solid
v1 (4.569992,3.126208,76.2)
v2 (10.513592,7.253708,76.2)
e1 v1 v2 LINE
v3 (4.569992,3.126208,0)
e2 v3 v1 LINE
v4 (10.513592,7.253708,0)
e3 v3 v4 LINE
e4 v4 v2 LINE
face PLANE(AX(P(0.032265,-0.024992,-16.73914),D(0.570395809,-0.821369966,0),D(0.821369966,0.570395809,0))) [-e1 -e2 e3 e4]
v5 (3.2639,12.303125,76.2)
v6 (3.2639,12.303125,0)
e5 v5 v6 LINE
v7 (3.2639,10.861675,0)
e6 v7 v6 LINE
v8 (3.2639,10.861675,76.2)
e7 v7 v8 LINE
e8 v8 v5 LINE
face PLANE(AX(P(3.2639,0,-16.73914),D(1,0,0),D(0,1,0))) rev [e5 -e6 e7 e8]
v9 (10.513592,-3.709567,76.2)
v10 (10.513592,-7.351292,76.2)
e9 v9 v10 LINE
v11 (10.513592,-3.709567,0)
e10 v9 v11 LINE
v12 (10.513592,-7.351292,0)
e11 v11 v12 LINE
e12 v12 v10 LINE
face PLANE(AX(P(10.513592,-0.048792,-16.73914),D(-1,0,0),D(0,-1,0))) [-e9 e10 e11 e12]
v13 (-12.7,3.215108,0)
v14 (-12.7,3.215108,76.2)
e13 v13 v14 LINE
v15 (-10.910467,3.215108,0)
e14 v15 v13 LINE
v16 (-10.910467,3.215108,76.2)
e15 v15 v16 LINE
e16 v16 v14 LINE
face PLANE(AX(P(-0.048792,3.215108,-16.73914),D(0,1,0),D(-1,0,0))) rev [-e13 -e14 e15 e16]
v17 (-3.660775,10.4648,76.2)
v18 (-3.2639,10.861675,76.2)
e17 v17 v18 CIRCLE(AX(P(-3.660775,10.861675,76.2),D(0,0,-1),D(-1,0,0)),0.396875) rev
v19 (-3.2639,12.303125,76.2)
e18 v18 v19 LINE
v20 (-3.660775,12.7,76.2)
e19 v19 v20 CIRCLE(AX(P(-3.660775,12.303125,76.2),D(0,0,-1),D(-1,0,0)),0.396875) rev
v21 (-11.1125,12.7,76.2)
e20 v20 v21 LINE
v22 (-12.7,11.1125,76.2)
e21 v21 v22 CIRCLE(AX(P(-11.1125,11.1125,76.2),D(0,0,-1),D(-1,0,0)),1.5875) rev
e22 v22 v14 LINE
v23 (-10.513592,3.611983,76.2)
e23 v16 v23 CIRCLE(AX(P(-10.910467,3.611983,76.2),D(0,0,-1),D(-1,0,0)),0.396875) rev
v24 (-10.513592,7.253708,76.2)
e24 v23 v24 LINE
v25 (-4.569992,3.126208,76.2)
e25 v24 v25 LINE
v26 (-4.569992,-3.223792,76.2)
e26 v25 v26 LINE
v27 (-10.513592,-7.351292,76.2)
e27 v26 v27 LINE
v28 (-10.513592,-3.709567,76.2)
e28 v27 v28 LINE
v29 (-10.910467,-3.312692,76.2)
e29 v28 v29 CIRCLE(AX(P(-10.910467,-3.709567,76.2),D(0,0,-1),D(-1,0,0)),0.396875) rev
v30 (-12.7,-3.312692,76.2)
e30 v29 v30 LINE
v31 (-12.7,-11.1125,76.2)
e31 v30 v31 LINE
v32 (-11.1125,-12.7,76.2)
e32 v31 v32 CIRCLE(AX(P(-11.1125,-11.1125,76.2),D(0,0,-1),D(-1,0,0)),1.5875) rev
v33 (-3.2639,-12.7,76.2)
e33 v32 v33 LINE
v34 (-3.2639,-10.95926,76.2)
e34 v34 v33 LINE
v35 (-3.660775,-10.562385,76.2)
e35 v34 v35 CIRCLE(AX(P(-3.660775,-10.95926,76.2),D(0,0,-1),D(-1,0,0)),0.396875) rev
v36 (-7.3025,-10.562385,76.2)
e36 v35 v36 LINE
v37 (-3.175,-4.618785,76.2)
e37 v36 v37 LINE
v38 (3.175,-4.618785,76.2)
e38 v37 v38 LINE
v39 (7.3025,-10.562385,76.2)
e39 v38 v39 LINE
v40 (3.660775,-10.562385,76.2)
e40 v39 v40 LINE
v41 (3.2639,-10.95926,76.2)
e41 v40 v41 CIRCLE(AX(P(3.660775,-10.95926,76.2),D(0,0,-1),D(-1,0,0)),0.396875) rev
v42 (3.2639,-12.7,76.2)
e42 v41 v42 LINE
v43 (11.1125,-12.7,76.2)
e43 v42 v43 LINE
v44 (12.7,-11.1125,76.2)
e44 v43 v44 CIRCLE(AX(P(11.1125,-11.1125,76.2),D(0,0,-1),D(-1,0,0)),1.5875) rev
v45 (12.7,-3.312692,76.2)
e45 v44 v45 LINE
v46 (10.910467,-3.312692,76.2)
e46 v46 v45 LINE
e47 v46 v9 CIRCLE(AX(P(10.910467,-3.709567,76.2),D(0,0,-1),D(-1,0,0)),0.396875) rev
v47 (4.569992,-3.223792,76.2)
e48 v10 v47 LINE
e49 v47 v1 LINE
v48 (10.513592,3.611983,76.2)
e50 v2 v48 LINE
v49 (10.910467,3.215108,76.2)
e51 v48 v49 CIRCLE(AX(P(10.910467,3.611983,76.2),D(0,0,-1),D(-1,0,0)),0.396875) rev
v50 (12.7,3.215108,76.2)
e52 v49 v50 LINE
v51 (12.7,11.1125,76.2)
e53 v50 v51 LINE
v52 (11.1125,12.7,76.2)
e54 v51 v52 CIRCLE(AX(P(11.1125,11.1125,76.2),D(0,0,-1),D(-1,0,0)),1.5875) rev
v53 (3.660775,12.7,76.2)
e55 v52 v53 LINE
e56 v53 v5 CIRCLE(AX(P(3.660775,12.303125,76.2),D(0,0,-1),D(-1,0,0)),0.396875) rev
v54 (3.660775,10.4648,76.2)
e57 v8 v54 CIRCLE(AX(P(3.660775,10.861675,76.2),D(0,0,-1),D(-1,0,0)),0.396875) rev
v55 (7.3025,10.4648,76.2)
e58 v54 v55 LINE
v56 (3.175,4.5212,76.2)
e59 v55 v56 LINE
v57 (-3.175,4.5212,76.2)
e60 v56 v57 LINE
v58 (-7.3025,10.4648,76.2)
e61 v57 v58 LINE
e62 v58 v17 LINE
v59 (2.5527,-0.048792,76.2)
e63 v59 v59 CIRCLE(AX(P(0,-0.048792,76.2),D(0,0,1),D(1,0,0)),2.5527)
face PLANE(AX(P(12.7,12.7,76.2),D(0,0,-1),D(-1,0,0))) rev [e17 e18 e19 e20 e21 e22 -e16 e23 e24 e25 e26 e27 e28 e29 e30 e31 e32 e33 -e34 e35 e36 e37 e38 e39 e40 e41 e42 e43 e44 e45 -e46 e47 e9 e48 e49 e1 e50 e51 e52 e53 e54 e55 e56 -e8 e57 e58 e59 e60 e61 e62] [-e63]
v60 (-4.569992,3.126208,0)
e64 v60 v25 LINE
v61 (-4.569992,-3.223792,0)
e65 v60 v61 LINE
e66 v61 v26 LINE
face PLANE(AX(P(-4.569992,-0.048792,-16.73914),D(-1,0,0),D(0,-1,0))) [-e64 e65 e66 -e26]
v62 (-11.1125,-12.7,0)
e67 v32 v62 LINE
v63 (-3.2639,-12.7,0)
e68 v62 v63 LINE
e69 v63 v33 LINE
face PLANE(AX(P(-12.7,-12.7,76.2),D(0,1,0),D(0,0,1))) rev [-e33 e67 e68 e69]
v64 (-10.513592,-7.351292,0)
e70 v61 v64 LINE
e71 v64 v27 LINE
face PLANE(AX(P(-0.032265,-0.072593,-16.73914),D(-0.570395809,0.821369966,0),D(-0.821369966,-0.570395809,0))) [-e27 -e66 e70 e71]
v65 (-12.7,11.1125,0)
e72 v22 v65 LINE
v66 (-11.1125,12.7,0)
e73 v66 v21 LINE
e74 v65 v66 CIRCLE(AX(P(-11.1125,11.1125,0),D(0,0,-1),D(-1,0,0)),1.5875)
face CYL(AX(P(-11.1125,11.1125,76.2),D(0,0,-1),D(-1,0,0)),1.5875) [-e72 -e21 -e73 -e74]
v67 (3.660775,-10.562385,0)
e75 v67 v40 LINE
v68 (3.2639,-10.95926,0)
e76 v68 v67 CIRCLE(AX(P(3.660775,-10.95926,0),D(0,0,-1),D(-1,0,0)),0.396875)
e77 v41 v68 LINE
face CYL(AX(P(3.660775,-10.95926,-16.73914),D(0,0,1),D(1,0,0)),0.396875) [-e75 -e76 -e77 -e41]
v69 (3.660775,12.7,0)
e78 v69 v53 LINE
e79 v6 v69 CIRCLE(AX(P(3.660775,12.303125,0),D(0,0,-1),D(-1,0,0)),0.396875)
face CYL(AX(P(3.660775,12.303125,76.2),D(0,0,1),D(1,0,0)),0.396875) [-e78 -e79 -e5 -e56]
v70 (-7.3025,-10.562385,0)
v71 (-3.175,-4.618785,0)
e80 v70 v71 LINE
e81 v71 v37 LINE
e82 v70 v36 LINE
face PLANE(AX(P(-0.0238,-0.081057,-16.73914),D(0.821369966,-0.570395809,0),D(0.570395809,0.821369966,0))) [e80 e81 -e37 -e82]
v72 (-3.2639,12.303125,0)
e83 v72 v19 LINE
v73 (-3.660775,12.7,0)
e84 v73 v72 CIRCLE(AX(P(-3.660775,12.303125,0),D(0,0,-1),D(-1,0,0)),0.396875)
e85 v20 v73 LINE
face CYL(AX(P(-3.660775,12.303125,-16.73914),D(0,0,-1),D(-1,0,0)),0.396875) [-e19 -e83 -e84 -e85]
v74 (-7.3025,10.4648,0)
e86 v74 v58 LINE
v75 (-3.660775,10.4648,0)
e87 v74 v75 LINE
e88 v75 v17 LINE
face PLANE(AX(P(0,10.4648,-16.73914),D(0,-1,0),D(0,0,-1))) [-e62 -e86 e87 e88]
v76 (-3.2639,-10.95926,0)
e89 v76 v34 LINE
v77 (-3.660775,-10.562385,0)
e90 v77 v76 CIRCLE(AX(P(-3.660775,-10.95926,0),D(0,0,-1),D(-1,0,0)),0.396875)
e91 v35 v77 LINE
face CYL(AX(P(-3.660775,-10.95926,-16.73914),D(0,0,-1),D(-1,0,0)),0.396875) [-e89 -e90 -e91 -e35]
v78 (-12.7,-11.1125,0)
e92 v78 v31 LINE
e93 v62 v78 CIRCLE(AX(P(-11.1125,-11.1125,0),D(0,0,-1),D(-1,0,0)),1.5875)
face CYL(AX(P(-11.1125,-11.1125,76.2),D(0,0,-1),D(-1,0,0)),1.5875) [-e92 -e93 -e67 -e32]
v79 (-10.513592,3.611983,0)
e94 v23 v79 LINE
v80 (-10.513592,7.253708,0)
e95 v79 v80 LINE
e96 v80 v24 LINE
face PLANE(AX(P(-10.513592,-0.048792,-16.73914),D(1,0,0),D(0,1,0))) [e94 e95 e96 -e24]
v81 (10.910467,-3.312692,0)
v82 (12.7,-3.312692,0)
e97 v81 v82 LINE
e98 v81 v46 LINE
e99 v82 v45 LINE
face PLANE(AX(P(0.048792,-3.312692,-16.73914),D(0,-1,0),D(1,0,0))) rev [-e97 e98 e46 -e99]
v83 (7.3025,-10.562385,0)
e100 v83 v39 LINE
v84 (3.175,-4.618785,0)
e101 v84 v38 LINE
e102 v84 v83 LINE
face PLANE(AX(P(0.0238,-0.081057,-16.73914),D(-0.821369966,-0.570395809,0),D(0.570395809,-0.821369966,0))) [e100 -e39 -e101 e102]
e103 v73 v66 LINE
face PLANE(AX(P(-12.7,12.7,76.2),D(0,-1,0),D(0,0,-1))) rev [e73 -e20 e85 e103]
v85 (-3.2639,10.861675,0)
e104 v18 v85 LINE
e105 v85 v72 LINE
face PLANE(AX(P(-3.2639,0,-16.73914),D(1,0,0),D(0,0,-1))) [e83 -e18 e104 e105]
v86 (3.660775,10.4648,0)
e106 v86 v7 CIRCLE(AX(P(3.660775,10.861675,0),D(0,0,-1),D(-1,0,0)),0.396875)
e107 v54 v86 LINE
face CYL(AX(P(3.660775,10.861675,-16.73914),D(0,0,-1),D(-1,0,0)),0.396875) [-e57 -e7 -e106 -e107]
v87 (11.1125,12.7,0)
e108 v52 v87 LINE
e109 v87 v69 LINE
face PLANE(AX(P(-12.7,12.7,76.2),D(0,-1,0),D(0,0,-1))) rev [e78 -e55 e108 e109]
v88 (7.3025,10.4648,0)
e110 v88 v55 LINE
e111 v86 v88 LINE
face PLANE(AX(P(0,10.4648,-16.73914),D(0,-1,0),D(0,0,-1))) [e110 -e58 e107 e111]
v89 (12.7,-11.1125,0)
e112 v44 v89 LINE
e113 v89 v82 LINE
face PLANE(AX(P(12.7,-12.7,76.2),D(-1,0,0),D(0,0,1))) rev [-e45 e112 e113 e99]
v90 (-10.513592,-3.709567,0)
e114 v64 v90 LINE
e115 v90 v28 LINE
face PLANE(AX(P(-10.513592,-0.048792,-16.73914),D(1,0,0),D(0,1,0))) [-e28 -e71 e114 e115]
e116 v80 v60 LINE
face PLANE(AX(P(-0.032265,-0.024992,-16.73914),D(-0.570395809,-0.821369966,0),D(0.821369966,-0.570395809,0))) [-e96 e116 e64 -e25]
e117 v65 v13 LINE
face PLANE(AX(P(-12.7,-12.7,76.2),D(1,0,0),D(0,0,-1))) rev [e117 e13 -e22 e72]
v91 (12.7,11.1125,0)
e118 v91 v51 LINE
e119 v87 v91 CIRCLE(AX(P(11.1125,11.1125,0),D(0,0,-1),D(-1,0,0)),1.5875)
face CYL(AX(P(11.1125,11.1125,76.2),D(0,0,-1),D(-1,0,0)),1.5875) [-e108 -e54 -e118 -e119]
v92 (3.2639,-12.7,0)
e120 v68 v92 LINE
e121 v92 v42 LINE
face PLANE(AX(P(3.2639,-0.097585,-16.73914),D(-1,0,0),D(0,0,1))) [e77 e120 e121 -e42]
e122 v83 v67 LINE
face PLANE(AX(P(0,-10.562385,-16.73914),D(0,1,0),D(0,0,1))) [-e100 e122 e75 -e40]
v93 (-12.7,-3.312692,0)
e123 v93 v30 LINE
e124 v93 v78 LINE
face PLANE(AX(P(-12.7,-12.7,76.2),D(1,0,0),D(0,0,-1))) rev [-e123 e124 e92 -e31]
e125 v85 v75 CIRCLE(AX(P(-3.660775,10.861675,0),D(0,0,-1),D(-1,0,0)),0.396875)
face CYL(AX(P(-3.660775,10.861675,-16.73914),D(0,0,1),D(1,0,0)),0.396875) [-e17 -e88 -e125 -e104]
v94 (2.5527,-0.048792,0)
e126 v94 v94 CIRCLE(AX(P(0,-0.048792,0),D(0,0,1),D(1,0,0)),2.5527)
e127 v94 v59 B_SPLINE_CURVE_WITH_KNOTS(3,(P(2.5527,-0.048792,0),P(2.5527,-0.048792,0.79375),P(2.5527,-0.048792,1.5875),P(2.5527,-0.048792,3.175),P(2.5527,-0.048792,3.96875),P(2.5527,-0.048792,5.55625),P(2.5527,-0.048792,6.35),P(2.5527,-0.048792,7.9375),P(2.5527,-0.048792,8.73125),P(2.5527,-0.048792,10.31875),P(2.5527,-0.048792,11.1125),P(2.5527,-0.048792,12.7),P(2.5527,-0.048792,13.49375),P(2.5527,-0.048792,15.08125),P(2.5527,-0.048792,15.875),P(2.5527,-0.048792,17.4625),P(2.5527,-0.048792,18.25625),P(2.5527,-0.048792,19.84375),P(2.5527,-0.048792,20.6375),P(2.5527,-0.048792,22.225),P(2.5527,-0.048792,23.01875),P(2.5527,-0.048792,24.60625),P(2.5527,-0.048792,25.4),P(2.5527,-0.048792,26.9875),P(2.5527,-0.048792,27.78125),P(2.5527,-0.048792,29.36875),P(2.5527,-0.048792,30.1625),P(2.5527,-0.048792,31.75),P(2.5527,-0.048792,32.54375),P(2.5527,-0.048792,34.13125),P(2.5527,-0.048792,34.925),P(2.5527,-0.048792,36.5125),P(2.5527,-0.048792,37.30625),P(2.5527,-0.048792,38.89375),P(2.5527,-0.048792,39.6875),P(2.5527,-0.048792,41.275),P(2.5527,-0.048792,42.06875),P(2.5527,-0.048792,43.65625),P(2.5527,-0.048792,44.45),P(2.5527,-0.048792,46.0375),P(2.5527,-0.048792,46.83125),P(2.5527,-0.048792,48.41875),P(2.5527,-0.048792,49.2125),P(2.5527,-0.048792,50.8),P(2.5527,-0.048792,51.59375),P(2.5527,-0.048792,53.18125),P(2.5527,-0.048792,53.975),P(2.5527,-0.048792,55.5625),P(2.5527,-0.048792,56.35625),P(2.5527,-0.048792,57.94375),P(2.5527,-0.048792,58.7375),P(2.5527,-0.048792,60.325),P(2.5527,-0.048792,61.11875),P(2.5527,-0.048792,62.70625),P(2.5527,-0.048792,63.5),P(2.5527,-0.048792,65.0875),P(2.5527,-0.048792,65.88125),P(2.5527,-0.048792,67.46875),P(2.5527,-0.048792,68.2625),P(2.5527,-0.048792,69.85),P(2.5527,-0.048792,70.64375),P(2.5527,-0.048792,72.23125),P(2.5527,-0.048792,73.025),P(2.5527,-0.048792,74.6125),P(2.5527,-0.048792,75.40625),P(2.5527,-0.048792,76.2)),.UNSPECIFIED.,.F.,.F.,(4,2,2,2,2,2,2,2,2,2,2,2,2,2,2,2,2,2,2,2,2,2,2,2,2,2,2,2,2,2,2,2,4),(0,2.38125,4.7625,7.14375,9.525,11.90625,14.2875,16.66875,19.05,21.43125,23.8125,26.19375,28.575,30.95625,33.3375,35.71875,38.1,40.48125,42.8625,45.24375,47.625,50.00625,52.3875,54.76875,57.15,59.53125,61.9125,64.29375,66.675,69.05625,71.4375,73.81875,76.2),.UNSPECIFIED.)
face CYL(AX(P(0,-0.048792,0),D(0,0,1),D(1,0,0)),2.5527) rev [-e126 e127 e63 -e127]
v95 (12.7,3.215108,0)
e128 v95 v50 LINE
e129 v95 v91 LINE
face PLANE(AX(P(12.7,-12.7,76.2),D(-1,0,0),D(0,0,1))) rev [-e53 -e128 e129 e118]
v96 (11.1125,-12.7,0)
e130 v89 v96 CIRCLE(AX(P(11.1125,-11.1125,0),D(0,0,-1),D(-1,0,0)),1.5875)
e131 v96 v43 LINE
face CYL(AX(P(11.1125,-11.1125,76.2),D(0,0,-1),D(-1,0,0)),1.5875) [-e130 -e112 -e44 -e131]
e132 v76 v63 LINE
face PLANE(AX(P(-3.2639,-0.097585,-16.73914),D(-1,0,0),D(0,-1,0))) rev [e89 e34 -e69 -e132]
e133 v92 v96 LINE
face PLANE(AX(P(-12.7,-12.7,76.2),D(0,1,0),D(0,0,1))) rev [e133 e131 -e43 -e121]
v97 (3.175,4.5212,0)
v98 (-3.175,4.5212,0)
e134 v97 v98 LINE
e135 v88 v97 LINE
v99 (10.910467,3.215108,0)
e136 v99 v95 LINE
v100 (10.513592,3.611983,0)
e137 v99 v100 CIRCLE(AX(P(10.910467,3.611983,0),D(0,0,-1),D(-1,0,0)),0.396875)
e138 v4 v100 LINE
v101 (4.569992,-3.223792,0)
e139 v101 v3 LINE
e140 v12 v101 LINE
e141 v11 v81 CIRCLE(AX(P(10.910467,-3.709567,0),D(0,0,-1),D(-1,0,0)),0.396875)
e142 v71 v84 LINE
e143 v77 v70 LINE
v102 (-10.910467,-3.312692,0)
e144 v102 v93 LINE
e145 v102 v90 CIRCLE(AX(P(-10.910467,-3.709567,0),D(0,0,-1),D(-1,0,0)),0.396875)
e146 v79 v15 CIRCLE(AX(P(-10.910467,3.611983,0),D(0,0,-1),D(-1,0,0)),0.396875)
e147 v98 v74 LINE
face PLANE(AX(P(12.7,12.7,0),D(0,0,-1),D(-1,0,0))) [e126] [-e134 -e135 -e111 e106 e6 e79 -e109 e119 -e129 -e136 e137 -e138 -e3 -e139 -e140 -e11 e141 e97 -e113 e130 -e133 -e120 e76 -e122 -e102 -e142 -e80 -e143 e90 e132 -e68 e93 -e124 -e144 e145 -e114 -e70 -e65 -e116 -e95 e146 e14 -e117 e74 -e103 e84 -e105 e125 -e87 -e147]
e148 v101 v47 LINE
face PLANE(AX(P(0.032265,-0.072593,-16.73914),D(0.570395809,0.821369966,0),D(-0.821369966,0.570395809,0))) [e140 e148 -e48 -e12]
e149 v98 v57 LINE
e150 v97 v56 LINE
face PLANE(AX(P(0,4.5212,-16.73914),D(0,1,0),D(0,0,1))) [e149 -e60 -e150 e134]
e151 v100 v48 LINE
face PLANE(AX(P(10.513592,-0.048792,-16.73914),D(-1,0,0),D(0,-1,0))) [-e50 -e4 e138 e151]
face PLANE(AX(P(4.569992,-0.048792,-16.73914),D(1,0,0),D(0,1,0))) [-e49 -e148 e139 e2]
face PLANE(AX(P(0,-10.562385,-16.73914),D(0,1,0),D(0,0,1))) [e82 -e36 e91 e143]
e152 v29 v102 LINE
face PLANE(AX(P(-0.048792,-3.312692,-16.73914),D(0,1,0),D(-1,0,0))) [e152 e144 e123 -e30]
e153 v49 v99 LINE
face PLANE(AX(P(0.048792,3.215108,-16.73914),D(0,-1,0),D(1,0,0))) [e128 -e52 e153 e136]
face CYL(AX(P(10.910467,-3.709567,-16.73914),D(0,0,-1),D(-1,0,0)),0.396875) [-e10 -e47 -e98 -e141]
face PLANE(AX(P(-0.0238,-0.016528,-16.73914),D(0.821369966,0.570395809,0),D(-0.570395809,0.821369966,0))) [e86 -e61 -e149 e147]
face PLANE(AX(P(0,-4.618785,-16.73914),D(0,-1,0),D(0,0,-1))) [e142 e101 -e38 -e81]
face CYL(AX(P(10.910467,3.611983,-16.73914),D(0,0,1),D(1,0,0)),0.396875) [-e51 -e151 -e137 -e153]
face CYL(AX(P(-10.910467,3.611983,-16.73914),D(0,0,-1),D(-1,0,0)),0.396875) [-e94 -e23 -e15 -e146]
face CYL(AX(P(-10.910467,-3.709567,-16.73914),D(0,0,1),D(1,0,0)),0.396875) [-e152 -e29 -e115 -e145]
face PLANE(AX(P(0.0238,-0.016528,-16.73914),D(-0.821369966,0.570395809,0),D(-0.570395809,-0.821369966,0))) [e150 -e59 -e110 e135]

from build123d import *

# Parameters (mm, degrees)
SKETCH1_W           = 25.4
SKETCH1_H           = 25.4
BOSS_EXTRUDE1_DEPTH = 76.2
FILLET1_R           = 1.5875
HOLE1_OUTLINE_R     = 2.5527
HOLE1_DEPTH         = 76.2
SKETCH7_W           = 6.5278
SKETCH7_H           = 2.2352
CUT_EXTRUDE2_DEPTH  = 76.2
FILLET4_R           = 0.396875
CIRPATTERN2_DEPTH   = 76.2


# Read off the part's stored shape, not the designer's step: Hole1, CirPattern2
with BuildPart() as part:
    # Sketch1 → Boss-Extrude1 (new body)
    with BuildSketch(Plane.XY):
        Rectangle(SKETCH1_W, SKETCH1_H)
    extrude(amount=BOSS_EXTRUDE1_DEPTH)

    # Fillet1
    fillet1_edges = [part.edges().sort_by_distance(p)[0] for p in [
        (12.7, -12.7, 38.1),
        (-12.7, -12.7, 38.1),
        (-12.7, 12.7, 38.1),
        (12.7, 12.7, 38.1),
    ]]
    fillet(fillet1_edges, radius=FILLET1_R)

    # Hole1 outline → Hole1 (cut)
    with BuildSketch(Plane.XY):
        with Locations((0, -0.048792482)):
            Circle(HOLE1_OUTLINE_R)
    extrude(amount=HOLE1_DEPTH, mode=Mode.SUBTRACT)

    # Sketch7 → Cut-Extrude2 (cut)
    with BuildSketch(Plane.XY.offset(76.2)):
        with Locations((0, 11.5824)):
            Rectangle(SKETCH7_W, SKETCH7_H)
        Polygon((-3.175, 4.5212), (-7.3025, 10.4648), (7.3025, 10.4648), (3.175, 4.5212), align=None)
    extrude(amount=-CUT_EXTRUDE2_DEPTH, mode=Mode.SUBTRACT)

    # Fillet4
    fillet4_edges = [part.edges().sort_by_distance(p)[0] for p in [
        (-3.2639, 10.4648, 38.1),
        (-3.2639, 12.7, 38.1),
        (3.2639, 12.7, 38.1),
        (3.2639, 10.4648, 38.1),
    ]]
    fillet(fillet4_edges, radius=FILLET4_R)

    # CirPattern2 outline → CirPattern2 (cut)
    with BuildSketch(Plane.XY):
        with BuildLine():
            ThreePointArc((-3.660775, -10.562384964), (-3.380141996, -10.67862696), (-3.2639, -10.959259964))
            Line((-3.2639, -10.959259964), (-3.2639, -12.7))
            Line((-3.2639, -12.7), (3.2639, -12.7))
            Line((3.2639, -12.7), (3.2639, -10.959259964))
            ThreePointArc((3.2639, -10.959259964), (3.380141996, -10.67862696), (3.660775, -10.562384964))
            Line((3.660775, -10.562384964), (7.3025, -10.562384964))
            Line((7.3025, -10.562384964), (3.175, -4.618784964))
            Line((3.175, -4.618784964), (-3.175, -4.618784964))
            Line((-3.175, -4.618784964), (-7.3025, -10.562384964))
            Line((-7.3025, -10.562384964), (-3.660775, -10.562384964))
        make_face()
        with BuildLine():
            Line((-12.7, -3.312692482), (-10.910467482, -3.312692482))
            ThreePointArc((-10.910467482, -3.312692482), (-10.629834478, -3.428934478), (-10.513592482, -3.709567482))
            Line((-10.513592482, -3.709567482), (-10.513592482, -7.351292482))
            Line((-10.513592482, -7.351292482), (-4.569992482, -3.223792482))
            Line((-4.569992482, -3.223792482), (-4.569992482, 3.126207518))
            Line((-4.569992482, 3.126207518), (-10.513592482, 7.253707518))
            Line((-10.513592482, 7.253707518), (-10.513592482, 3.611982518))
            ThreePointArc((-10.513592482, 3.611982518), (-10.629834478, 3.331349514), (-10.910467482, 3.215107518))
            Line((-10.910467482, 3.215107518), (-12.7, 3.215107518))
            Line((-12.7, 3.215107518), (-12.7, -3.312692482))
        make_face()
        with BuildLine():
            ThreePointArc((10.513592482, -3.709567482), (10.629834478, -3.428934478), (10.910467482, -3.312692482))
            Line((10.910467482, -3.312692482), (12.7, -3.312692482))
            Line((12.7, -3.312692482), (12.7, 3.215107518))
            Line((12.7, 3.215107518), (10.910467482, 3.215107518))
            ThreePointArc((10.910467482, 3.215107518), (10.629834478, 3.331349514), (10.513592482, 3.611982518))
            Line((10.513592482, 3.611982518), (10.513592482, 7.253707518))
            Line((10.513592482, 7.253707518), (4.569992482, 3.126207518))
            Line((4.569992482, 3.126207518), (4.569992482, -3.223792482))
            Line((4.569992482, -3.223792482), (10.513592482, -7.351292482))
            Line((10.513592482, -7.351292482), (10.513592482, -3.709567482))
        make_face()
    extrude(amount=CIRPATTERN2_DEPTH, mode=Mode.SUBTRACT)


solid = part.part
